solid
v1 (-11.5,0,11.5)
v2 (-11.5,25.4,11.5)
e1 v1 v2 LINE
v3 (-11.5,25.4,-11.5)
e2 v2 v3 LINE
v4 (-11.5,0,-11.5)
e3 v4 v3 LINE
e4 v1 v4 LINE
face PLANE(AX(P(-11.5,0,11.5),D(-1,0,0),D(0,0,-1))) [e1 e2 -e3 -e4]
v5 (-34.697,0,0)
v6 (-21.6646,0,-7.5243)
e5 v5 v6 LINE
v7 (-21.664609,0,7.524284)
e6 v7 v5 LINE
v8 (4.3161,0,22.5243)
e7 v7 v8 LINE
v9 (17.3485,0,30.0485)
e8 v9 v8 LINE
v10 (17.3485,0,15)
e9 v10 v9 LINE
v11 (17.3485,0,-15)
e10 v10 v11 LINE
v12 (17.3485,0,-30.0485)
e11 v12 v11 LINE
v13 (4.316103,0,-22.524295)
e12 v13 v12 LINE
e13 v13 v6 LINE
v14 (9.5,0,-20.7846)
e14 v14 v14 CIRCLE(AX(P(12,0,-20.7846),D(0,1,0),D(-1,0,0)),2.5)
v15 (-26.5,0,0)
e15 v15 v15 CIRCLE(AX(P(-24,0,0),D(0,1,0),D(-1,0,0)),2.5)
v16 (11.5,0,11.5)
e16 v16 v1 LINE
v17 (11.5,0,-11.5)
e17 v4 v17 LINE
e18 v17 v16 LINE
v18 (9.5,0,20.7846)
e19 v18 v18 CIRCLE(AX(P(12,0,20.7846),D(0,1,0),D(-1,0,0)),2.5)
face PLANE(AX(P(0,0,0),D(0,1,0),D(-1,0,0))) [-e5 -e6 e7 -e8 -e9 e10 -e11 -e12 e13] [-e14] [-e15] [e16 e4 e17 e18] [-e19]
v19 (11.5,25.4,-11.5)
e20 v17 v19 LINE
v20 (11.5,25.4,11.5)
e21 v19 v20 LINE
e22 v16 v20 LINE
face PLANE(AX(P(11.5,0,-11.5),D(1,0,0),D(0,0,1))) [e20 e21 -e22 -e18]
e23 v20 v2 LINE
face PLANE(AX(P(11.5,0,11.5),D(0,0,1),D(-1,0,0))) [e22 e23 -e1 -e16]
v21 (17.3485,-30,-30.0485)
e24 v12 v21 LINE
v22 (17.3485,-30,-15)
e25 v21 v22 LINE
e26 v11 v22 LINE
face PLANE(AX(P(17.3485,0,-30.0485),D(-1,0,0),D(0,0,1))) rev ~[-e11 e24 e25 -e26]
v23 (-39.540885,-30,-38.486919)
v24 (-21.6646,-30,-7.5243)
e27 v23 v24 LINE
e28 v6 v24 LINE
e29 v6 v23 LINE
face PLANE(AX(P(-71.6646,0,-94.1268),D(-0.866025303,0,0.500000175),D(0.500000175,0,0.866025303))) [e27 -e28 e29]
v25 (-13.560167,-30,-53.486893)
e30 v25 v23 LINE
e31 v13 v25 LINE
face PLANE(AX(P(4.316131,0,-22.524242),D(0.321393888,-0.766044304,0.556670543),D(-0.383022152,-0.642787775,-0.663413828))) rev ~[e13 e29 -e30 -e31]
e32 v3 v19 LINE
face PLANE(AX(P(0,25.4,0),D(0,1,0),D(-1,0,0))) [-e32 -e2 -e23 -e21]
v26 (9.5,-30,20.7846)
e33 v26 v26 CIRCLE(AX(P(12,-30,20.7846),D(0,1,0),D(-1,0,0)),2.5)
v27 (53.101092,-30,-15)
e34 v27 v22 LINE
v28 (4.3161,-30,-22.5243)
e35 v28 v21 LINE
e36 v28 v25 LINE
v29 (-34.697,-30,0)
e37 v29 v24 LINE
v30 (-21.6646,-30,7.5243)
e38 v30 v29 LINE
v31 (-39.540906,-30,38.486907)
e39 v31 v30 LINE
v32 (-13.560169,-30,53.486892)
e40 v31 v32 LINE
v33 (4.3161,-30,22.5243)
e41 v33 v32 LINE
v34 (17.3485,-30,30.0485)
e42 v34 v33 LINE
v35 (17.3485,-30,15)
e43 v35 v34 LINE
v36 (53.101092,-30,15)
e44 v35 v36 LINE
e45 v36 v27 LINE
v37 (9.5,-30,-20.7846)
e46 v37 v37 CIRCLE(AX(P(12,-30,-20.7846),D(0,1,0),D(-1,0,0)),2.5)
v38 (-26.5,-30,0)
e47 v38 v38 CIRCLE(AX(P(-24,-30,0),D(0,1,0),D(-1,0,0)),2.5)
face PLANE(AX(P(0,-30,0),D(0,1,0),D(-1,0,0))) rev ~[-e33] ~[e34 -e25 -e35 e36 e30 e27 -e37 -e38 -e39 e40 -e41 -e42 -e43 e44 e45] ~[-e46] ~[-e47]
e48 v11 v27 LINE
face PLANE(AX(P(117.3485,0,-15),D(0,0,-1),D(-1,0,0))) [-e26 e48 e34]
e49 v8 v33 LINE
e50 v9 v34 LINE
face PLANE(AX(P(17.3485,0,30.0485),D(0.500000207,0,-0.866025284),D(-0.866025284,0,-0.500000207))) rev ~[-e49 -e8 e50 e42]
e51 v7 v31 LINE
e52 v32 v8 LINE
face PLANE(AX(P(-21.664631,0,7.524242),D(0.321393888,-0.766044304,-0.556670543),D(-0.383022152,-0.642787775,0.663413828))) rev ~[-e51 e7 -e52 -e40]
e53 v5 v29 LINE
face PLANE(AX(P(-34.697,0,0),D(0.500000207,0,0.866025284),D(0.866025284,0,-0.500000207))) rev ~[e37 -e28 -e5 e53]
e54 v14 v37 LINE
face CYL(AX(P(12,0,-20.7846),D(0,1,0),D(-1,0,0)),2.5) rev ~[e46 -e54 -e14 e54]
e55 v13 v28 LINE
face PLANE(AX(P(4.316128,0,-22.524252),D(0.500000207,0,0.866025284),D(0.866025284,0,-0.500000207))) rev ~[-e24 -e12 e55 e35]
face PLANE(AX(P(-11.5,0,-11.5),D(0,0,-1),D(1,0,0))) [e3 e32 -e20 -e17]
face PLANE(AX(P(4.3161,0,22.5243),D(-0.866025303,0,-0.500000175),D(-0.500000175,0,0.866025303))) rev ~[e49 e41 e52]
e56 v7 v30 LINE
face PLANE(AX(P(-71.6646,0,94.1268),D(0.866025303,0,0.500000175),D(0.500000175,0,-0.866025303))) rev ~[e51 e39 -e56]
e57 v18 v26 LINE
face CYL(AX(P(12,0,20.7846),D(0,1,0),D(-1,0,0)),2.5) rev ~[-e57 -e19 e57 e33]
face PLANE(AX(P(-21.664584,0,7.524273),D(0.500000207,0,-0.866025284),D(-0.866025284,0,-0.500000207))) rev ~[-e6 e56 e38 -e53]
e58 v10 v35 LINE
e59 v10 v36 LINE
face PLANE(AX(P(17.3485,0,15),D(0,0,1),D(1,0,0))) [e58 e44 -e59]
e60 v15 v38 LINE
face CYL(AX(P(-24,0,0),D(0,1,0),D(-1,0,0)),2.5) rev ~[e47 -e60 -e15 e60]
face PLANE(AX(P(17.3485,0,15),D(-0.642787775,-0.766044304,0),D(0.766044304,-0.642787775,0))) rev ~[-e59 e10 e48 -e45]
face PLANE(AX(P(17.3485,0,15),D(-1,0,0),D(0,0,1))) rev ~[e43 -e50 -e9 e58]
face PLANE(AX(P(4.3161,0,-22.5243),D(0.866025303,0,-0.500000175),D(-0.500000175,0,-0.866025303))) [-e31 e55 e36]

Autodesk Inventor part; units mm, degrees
ref_plane "YZ Plane" through (0, 0, 0) normal (1, 0, 0) x (0, 1, 0)
ref_plane "XZ Plane" through (0, 0, 0) normal (0, 1, 0) x (-1, 0, 0)
ref_plane "XY Plane" through (0, 0, 0) normal (0, 0, 1) x (1, 0, 0)
sketch "Sketch1" plane through (0, 0, 0) normal (0, 1, 0) x (-1, 0, 0)
  line L0 (34.697, 0) -> (-17.3485, -30.0485)
  line L1 (-17.3485, -30.0485) -> (-17.3485, 30.0485)
  line L2 (-17.3485, 30.0485) -> (34.697, 0)
  line L3 (12.7, -12.7) -> (-12.7, -12.7) construction
  line L4 (-12.7, -12.7) -> (-12.7, 12.7) construction
  line L5 (-12.7, 12.7) -> (12.7, 12.7) construction
  line L6 (12.7, 12.7) -> (12.7, -12.7) construction
  line L7 (-17.3485, 15) -> (-117.3485, 15)
  line L8 (-117.3485, 15) -> (-117.3485, -15)
  line L9 (-117.3485, -15) -> (-17.3485, -15)
  line L10 (-4.3161, -22.5243) -> (45.6839, -109.1268)
  line L11 (45.6839, -109.1268) -> (71.6646, -94.1268)
  line L12 (71.6646, -94.1268) -> (21.6646, -7.5243)
  line L13 (0, 0) -> (58.6743, -101.6268) construction
  line L14 (0, 0) -> (-117.3485, 0) construction
  line L15 (-4.3161, 22.5243) -> (45.6839, 109.1268)
  line L16 (45.6839, 109.1268) -> (71.6646, 94.1268)
  line L17 (71.6646, 94.1268) -> (21.6646, 7.5243)
  line L18 (58.6743, 101.6268) -> (0, 0) construction
  line L19 (11.5, -11.5) -> (-11.5, -11.5)
  line L20 (-11.5, -11.5) -> (-11.5, 11.5)
  line L21 (-11.5, 11.5) -> (11.5, 11.5)
  line L22 (11.5, 11.5) -> (11.5, -11.5)
  circle A0 centre (-12, 20.7846) radius 2.5
  line L23 (0, 0) -> (-17.3485, 30.0485) construction
  line L24 (0, 0) -> (-17.3485, -30.0485) construction
  line L25 (0, 0) -> (34.697, 0) construction
  circle A1 centre (-12, -20.7846) radius 2.5
  circle A2 centre (24, 0) radius 2.5
  dimension "d1" = 25.4
  dimension "d2" = 30
  dimension "d3" = 100
  dimension "d4" = 30
  dimension "d5" = 100
  dimension "d6" = 120
  dimension "d7" = 30
  dimension "d8" = 100
  dimension "d9" = 120
  dimension "d10" = 23
  dimension "d21" = 5
  dimension "d22" = 24
  dimension "d23" = 5
  dimension "d24" = 5
  dimension "d25" = 24
  dimension "d26" = 24
extrude "Extrusion1" add sketch "Sketch1" against normal blind 30 contours L0 L1 L2 | L12 L11 L10 L0 | L2 L15 L16 L17 | L9 L8 L7 L1 | L19 L20 L21 L22 | A0 | A1 | A2
sketch "Sketch2" plane through (17.3485, 0, 15) normal (0, 0, 1) x (1, 0, 0)
  line L0 (0, 0) -> (100, 0) construction
  line L1 (0, -30) -> (0, 0) construction
  line L2 (100, -30) -> (0, -30) construction
  line L3 (100, 0) -> (100, -30) projected
  line L4 (0, 0) -> (100, -83.91)
  line L5 (100, 0) -> (100, -30) projected
  line L6 (100, -83.91) -> (100, 0)
  line L7 (0, 0) -> (100, 0)
  point P0 (-17.3485, 0)
  dimension "d13" = 40
extrude "Extrusion2" cut sketch "Sketch2" against normal up to next
pattern_circular "Circular Pattern1" count 3 over 360 about axis through (0, -10, 0) along (0, 1, 0) of "Extrusion2"
extrude "Extrusion3" add sketch "Sketch1" along normal blind 25.4 contours L19 L20 L21 L22
extrude "Extrusion4" cut sketch "Sketch1" against normal up to next contours A0 | A1 | A2
equation "\"d4\" = d2"
equation "\"d5\" = d3"
equation "\"d7\" = d2"
equation "\"d8\" = d3"
equation "\"d9\" = d6"
equation "\"d23\" = d21"
equation "\"d24\" = d21"
equation "\"d25\" = d22"
equation "\"d26\" = d22"
properties part number "core"
